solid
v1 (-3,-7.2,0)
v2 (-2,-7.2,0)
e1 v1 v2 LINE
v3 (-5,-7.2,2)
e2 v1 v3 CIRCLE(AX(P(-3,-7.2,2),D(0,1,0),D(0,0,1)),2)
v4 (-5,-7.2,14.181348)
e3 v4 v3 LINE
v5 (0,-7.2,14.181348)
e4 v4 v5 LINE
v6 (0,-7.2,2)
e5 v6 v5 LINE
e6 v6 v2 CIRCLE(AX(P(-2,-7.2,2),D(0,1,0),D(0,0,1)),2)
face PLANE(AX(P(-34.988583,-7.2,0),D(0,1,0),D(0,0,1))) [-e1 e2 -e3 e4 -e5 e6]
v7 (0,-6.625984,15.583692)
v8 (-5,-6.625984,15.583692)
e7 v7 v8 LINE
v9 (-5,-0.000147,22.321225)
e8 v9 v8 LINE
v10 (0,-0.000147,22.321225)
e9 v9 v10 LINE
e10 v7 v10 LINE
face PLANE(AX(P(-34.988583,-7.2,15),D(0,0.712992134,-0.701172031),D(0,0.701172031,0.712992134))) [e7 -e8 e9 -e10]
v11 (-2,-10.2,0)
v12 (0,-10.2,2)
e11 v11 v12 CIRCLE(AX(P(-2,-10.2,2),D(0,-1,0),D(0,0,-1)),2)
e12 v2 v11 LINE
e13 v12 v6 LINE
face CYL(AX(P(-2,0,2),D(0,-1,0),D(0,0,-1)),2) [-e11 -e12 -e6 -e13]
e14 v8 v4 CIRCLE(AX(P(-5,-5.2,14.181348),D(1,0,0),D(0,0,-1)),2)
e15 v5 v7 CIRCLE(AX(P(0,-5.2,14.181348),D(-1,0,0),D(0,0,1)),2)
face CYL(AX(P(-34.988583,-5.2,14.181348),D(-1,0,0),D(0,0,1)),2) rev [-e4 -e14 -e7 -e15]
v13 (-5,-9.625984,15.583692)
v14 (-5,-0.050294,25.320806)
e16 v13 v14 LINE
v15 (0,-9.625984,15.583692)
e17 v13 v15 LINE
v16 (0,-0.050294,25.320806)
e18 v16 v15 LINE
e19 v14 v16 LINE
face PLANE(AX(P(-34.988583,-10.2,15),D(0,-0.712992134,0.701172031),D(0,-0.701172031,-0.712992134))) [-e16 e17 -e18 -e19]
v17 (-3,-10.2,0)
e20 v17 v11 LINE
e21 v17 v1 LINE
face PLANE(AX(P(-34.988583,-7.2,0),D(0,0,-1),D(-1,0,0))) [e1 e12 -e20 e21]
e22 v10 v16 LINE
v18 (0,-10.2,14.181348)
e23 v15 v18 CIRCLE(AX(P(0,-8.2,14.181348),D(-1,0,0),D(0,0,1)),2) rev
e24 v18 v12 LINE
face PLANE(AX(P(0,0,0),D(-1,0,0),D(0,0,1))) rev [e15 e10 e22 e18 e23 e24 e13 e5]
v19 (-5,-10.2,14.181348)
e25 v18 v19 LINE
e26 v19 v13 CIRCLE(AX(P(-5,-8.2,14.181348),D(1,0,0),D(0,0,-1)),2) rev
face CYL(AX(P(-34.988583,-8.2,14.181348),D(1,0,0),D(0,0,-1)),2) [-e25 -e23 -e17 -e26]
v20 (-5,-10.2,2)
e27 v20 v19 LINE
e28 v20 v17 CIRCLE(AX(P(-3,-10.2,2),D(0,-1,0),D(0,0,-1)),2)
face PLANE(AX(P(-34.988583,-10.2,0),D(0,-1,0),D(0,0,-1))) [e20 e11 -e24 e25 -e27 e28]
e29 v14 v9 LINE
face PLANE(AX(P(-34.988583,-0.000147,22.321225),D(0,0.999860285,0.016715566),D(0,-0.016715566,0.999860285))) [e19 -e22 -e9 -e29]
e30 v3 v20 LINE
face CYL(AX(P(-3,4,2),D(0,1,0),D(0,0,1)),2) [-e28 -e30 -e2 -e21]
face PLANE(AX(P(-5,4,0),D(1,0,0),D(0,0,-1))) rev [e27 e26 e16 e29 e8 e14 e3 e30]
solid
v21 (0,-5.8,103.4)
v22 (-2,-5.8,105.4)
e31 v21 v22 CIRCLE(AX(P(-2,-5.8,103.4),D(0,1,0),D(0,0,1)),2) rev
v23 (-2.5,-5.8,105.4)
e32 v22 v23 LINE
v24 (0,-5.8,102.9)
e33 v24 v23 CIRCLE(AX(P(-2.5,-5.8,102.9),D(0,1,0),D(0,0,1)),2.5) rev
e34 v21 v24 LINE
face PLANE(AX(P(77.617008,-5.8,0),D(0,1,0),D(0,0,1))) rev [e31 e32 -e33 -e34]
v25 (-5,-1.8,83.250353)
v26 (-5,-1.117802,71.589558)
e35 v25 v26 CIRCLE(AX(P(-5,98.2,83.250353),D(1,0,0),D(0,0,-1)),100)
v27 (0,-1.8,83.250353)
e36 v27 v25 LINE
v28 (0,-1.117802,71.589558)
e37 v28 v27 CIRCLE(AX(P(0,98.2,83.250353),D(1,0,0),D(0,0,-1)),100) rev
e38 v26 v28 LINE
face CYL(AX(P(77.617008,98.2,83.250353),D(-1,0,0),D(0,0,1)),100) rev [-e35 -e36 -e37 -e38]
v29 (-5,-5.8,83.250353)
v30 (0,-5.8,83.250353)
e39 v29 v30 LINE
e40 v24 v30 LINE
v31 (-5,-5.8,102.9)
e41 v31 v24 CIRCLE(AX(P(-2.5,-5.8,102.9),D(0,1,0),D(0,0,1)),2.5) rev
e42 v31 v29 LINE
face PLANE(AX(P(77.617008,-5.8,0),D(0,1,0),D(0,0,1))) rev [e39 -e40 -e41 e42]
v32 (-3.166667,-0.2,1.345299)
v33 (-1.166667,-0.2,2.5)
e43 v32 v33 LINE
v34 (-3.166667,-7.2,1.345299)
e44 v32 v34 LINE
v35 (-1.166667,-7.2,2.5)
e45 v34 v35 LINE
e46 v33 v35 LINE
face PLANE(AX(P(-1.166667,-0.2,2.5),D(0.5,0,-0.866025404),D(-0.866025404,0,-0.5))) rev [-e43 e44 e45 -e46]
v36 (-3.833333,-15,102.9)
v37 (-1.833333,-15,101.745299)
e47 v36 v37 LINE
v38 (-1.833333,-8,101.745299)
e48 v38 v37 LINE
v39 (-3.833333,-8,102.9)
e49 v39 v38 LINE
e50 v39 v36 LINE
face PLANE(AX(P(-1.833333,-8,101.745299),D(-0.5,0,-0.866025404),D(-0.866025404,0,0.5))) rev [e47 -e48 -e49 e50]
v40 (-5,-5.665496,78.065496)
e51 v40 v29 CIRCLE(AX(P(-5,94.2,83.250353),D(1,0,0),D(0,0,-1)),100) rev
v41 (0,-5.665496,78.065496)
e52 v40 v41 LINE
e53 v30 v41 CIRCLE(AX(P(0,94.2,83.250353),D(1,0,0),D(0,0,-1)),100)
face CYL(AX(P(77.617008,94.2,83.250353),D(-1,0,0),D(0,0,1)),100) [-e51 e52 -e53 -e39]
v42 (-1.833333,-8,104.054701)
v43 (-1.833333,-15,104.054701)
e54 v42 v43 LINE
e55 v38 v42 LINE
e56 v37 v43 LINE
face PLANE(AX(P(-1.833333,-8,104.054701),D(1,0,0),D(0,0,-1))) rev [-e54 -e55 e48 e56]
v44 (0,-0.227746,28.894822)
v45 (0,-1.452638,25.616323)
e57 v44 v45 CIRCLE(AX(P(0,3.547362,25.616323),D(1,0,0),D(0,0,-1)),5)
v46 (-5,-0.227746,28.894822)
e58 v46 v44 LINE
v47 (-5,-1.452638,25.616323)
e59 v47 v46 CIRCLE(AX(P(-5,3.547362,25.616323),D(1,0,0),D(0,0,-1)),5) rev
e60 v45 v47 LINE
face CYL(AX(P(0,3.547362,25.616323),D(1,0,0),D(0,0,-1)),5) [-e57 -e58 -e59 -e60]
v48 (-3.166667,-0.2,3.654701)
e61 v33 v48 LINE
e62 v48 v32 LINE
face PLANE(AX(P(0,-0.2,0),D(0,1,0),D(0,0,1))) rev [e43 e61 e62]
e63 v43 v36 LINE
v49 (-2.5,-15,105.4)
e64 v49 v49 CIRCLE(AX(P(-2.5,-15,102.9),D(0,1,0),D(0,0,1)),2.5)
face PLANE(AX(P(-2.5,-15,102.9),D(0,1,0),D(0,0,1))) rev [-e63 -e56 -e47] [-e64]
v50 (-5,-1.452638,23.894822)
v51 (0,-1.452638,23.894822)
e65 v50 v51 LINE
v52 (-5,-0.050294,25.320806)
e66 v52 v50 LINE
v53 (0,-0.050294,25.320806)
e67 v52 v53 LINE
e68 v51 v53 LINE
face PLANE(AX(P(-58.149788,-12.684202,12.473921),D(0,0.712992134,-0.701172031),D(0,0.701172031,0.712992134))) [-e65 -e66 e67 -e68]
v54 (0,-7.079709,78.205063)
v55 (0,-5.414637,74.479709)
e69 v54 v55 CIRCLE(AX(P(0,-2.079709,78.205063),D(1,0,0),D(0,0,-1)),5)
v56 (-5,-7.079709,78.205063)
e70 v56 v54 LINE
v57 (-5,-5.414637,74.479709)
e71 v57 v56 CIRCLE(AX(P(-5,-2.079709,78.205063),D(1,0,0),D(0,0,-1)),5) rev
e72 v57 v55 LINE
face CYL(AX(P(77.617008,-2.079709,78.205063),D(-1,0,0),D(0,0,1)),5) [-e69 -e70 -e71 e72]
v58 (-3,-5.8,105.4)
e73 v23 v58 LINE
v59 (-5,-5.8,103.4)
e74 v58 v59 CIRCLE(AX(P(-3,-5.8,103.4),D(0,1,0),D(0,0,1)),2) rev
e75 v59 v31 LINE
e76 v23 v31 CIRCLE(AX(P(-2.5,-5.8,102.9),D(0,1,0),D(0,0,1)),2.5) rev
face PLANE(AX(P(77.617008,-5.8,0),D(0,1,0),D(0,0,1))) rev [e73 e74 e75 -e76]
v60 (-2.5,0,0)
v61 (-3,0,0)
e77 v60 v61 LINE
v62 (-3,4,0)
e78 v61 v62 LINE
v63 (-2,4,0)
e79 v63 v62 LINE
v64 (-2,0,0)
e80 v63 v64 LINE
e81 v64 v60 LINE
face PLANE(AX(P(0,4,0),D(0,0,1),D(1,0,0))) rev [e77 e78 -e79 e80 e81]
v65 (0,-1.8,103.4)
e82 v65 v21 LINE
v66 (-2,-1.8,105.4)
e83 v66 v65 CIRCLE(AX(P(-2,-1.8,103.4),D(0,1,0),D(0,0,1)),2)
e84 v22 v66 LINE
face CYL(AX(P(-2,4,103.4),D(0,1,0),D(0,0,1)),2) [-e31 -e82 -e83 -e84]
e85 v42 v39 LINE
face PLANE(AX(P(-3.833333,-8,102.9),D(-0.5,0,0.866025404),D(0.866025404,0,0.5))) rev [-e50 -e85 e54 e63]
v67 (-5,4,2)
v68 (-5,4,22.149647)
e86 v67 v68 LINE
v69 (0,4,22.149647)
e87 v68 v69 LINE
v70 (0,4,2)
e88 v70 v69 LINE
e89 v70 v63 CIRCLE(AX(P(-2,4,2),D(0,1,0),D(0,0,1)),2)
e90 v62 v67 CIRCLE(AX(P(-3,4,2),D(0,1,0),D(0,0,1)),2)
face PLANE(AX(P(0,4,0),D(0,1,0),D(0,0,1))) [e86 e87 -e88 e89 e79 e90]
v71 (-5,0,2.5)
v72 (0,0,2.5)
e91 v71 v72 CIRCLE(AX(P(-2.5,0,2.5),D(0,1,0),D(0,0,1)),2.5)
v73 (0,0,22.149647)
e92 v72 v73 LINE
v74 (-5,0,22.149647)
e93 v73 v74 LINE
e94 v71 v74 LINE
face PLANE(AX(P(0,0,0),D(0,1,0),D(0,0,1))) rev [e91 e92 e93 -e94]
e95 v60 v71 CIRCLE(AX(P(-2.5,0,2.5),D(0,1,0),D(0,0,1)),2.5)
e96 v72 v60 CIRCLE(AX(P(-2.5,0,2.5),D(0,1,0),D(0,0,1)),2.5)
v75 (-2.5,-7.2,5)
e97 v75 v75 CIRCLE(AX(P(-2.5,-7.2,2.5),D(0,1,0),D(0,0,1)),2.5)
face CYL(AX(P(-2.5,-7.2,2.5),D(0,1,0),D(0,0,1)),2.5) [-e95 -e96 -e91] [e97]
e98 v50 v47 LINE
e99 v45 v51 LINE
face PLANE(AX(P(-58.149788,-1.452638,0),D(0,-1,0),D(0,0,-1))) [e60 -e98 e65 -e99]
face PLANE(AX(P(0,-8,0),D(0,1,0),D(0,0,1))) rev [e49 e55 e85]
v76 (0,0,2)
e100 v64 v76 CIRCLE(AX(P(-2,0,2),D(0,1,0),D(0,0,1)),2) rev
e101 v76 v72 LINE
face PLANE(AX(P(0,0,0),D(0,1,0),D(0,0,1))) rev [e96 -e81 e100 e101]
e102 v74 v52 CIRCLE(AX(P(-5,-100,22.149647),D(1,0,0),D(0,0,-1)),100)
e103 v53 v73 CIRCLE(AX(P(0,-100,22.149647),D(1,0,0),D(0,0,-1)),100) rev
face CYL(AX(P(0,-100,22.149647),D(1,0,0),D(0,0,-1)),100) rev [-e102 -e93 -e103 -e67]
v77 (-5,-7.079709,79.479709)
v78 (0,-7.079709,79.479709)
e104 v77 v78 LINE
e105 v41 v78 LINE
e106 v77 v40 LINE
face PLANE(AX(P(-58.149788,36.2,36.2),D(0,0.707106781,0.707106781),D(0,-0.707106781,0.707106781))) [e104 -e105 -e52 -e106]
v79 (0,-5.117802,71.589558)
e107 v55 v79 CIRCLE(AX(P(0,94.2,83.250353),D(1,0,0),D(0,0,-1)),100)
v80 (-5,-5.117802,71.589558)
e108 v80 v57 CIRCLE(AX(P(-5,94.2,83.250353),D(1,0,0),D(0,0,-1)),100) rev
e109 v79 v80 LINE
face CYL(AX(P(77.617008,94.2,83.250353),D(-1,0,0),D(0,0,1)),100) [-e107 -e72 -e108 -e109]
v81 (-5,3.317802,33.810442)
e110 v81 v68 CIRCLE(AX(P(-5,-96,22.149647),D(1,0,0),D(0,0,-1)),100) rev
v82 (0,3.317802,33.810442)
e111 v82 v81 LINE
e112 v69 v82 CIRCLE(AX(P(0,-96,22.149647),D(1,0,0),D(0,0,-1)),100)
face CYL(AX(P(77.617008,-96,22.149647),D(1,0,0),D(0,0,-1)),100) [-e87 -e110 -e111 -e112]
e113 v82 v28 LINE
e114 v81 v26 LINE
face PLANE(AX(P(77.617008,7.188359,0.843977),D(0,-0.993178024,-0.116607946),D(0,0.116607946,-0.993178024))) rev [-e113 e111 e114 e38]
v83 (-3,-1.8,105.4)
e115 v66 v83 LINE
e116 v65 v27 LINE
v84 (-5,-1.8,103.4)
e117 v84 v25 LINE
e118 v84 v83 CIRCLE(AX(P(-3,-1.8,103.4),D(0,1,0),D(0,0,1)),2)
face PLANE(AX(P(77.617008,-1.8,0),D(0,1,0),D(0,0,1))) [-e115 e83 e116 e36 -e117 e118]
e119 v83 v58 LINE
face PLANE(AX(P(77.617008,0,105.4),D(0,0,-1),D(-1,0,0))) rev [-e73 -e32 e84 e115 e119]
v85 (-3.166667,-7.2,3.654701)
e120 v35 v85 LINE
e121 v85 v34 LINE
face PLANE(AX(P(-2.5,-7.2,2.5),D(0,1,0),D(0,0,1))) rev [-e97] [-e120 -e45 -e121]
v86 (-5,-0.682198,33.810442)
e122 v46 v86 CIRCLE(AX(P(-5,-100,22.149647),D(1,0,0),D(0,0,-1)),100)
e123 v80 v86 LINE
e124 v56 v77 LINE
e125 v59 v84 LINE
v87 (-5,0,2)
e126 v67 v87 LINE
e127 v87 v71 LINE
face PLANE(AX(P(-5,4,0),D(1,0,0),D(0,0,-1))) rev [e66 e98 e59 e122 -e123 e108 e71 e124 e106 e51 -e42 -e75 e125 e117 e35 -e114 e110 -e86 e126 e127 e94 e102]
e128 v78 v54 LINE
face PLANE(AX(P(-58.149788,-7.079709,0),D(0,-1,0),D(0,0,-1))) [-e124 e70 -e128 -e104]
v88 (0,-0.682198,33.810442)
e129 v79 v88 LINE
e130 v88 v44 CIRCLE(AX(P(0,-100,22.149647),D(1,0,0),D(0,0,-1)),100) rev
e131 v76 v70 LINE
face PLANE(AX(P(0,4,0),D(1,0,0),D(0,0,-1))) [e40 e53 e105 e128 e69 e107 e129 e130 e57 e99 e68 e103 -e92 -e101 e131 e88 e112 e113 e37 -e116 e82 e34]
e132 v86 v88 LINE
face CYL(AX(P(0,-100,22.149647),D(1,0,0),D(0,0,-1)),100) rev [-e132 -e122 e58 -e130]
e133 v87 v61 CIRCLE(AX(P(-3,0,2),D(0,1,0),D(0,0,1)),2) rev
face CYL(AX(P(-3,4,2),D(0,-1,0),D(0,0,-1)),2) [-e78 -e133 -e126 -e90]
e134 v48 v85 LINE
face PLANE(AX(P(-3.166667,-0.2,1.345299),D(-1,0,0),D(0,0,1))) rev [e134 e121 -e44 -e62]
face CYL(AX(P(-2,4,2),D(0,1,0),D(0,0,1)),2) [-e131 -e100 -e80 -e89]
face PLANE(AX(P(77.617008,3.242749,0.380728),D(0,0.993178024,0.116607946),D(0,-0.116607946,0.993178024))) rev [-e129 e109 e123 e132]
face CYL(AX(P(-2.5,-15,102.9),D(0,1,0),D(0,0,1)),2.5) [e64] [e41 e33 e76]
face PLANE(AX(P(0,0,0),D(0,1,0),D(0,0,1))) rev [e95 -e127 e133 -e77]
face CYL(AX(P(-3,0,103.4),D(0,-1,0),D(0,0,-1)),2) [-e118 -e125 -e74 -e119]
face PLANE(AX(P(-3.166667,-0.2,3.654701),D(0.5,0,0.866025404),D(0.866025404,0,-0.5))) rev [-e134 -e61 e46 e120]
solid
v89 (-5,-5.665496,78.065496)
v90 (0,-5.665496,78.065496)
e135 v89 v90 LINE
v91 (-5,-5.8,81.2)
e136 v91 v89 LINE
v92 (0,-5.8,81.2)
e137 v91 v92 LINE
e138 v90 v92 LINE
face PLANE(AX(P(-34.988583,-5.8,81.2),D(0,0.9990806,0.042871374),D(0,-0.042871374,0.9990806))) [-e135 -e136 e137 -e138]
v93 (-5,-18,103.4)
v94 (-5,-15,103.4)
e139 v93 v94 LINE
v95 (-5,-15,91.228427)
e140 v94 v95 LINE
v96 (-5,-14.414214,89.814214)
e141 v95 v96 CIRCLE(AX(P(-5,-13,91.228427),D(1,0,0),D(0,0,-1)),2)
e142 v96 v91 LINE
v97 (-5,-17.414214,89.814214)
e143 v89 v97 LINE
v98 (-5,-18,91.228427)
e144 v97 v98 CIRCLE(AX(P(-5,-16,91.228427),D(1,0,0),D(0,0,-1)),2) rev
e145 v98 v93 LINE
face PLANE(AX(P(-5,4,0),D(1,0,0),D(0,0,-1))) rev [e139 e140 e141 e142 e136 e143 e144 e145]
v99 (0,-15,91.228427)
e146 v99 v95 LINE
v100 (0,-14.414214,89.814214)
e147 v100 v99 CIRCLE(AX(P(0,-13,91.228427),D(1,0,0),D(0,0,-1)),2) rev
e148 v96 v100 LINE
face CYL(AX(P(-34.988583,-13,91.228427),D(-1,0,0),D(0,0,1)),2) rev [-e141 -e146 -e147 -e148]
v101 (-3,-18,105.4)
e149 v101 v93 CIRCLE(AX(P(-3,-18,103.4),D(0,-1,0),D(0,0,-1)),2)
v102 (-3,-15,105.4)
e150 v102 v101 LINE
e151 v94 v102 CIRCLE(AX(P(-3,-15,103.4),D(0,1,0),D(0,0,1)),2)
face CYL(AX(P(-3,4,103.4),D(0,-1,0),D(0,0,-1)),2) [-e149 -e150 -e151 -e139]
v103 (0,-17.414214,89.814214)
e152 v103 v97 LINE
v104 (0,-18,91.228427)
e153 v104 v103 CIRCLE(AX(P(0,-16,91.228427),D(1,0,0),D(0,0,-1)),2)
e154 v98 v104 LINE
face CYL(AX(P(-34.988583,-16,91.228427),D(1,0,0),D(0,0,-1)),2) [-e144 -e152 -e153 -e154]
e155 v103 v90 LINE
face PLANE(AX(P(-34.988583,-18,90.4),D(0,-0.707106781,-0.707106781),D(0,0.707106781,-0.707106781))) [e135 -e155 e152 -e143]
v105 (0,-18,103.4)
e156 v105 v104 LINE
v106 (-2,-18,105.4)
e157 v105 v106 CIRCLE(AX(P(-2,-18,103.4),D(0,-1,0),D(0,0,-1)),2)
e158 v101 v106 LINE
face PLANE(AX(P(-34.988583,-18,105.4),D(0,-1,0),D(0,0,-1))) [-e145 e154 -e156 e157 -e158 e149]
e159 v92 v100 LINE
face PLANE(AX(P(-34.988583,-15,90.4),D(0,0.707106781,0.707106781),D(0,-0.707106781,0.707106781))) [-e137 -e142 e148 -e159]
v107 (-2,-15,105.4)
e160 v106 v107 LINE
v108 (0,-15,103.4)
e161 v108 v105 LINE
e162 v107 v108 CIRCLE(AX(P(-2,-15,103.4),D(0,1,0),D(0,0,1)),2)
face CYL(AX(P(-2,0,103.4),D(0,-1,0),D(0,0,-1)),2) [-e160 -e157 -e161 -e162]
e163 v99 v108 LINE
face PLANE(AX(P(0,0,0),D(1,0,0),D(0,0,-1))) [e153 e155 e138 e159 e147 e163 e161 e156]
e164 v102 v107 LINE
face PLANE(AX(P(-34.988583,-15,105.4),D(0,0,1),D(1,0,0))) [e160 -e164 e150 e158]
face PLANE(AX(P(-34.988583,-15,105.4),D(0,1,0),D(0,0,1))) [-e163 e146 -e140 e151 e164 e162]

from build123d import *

# Parameters (mm, degrees)
SKETCH1_W             = 5
SKETCH1_H             = 105.4
BOSS_EXTRUDE1_DEPTH   = 4
SKETCH1_3_R           = 2.5
BOSS_EXTRUDE2_DEPTH   = 15
SKETCH1_4_R           = 2.5
BOSS_EXTRUDE3_DEPTH   = 7.2
FILLET1_R             = 1
CUT_EXTRUDE1_DEPTH    = 7
CUT_EXTRUDE2_DEPTH    = 7
BOSS_EXTRUDE4_DEPTH   = 5
CUT_EXTRUDE3_DEPTH    = 5
FILLET2_R             = 100
BOSS_EXTRUDE6_DEPTH   = 5
BOSS_EXTRUDE6_2_DEPTH = 5
BOSS_EXTRUDE7_DEPTH   = 5
FILLET3_R             = 5
FILLET4_R             = 2
FILLET5_R             = 2
FILLET6_R             = 2


with BuildPart() as part:
    # Sketch1 → Boss-Extrude1 (new body)
    with BuildSketch(Plane(origin=(0, 0, 0), x_dir=(1, 0, 0), z_dir=(0, 1, 0))):
        with Locations((-2.5, -52.7)):
            Rectangle(SKETCH1_W, SKETCH1_H)
    extrude(amount=BOSS_EXTRUDE1_DEPTH)

    # Sketch1<3> → Boss-Extrude2 (add)
    with BuildSketch(Plane(origin=(0, 0, 0), x_dir=(1, 0, 0), z_dir=(0, 1, 0))):
        with Locations(Location((-2.5, -102.9, 0), (0, 0, 270))):
            Circle(SKETCH1_3_R)
    extrude(amount=-BOSS_EXTRUDE2_DEPTH)

    # Sketch1<4> → Boss-Extrude3 (add)
    with BuildSketch(Plane(origin=(0, 0, 0), x_dir=(1, 0, 0), z_dir=(0, 1, 0))):
        with Locations(Location((-2.5, -2.5, 0), (0, 0, 270))):
            Circle(SKETCH1_4_R)
    extrude(amount=-BOSS_EXTRUDE3_DEPTH)

    # Fillet1
    fillet1_edges = [part.edges().sort_by_distance(p)[0] for p in [
        (0, 2, 105.4),
        (-5, 2, 105.4),
    ]]
    fillet(fillet1_edges, radius=FILLET1_R)

    # Sketch2 → Cut-Extrude1 (cut)
    with BuildSketch(Plane.XZ.offset(15)):
        Polygon((-1.833333333, 104.054700538), (-1.833333333, 101.745299462), (-3.833333333, 102.9), align=None)
    extrude(amount=-CUT_EXTRUDE1_DEPTH, mode=Mode.SUBTRACT)

    # Sketch3 → Cut-Extrude2 (cut)
    with BuildSketch(Plane(origin=(0, -7.2, 0), x_dir=(-1, 0, 0), z_dir=(0, -1, 0))):
        Polygon((3.166666667, -1.345299462), (3.166666667, -3.654700538), (1.166666667, -2.5), align=None)
    extrude(amount=-CUT_EXTRUDE2_DEPTH, mode=Mode.SUBTRACT)

    # Sketch4 → Boss-Extrude4 (add)
    with BuildSketch(Plane.ZY.offset(5)):
        Polygon((105.4, -5.8), (105.4, -1.8), (77.4, -1.8), (28, 4), (28, 0), (77.4, -5.8), align=None)
    extrude(amount=-BOSS_EXTRUDE4_DEPTH)

    # Sketch4<4> → Cut-Extrude3 (cut)
    with BuildSketch(Plane.ZY.offset(5)):
        Polygon((77.4, -1.8), (105.4, -1.8), (105.4, 4), (28, 4), align=None)
    extrude(amount=-CUT_EXTRUDE3_DEPTH, mode=Mode.SUBTRACT)

    # Fillet2
    fillet2_edges = [part.edges().sort_by_distance(p)[0] for p in [
        (-2.5, 4, 28),
        (-2.5, -1.8, 77.4),
        (-2.5, -5.8, 77.4),
        (-2.5, 0, 28),
    ]]
    fillet(fillet2_edges, radius=FILLET2_R)

    # Sketch6 → Boss-Extrude7 (add)
    with BuildSketch(Plane(origin=(0, 0, 0), x_dir=(0, 0, -1), z_dir=(1, 0, 0))):
        Polygon((-74.479709397, -5.414636547), (-78.065495835, -5.665495835), (-79.479709397, -7.079709397), (-74.479709397, -7.079709397), align=None)
        with BuildLine():
            ThreePointArc((-25.320806157, -0.050293893), (-27.108607835, -0.123032137), (-28.89482189, -0.227746249))
            Line((-28.89482189, -0.227746249), (-28.89482189, -1.452637955))
            Line((-28.89482189, -1.452637955), (-23.89482189, -1.452637955))
            Line((-23.89482189, -1.452637955), (-25.320806157, -0.050293893))
        make_face()
    extrude(amount=-BOSS_EXTRUDE7_DEPTH)

    # Fillet3
    # the kernel refuses this fillet: 5 mm, written as the material it takes off along each edge
    with BuildSketch(Plane(origin=(9.313384489, -7.079709397, 74.479709397), x_dir=(0, 1, 0), z_dir=(-1, 0, 0))) as fillet3_piece_1:
        with BuildLine():
            CenterArc((5, -3.725353796), FILLET3_R, 131.834823038, 48.165176962)
            Line((0, -3.725353796), (-0.1, -3.725353796))
            Line((-0.1, -3.725353796), (-0.1, 0))
            Line((-0.1, 0), (0, 0.1))
            ThreePointArc((0, 0.1), (0.832536425, 0.1), (1.598374307, 0.074507076))
            Line((1.598374307, 0.074507076), (1.66507285, 0))
        make_face()
    extrude(amount=23.626768978, mode=Mode.SUBTRACT)
    with BuildSketch(Plane(origin=(8.196248138, -1.452637955, 28.89482189), x_dir=(0, 1, 0), z_dir=(-1, 0, 0))) as fillet3_piece_2:
        with BuildLine():
            CenterArc((5, 3.278499255), FILLET3_R, 180, 40.972737691)
            Line((0, 3.278499255), (-0.1, 3.278499255))
            Line((-0.1, 3.278499255), (-0.1, 0))
            Line((-0.1, 0), (0, -0.1))
            ThreePointArc((0, -0.1), (0.612445853, -0.1), (1.14938954, -0.065569985))
            Line((1.14938954, -0.065569985), (1.224891706, 0))
        make_face()
    extrude(amount=21.392496276, mode=Mode.SUBTRACT)

    # Fillet5
    fillet5_edges = [part.edges().sort_by_distance(p)[0] for p in [
        (0, -3.8, 105.4),
        (-5, -3.8, 105.4),
        (0, 2, 0),
        (-5, 2, 0),
    ]]
    fillet(fillet5_edges, radius=FILLET5_R)


with BuildPart() as body_2:
    # Sketch5 → Boss-Extrude6 (new body)
    with BuildSketch(Plane(origin=(0, 0, 0), x_dir=(0, 0, -1), z_dir=(1, 0, 0))):
        Polygon((-90.4, -15), (-81.2, -5.8), (-78.065495835, -5.665495835), (-90.4, -18), (-105.4, -18), (-105.4, -15), align=None)
    extrude(amount=-BOSS_EXTRUDE6_DEPTH)

    # Fillet6
    fillet6_edges = [body_2.edges().sort_by_distance(p)[0] for p in [
        (-2.5, -18, 90.4),
        (-2.5, -15, 90.4),
        (-5, -16.5, 105.4),
        (0, -16.5, 105.4),
    ]]
    fillet(fillet6_edges, radius=FILLET6_R)


with BuildPart() as body_3:
    # Sketch5 → Boss-Extrude6 2 (new body)
    with BuildSketch(Plane(origin=(0, 0, 0), x_dir=(0, 0, -1), z_dir=(1, 0, 0))):
        Polygon((0, -7.2), (-15, -7.2), (-22.321225302, -0.000147195), (-25.320806157, -0.050293893), (-15, -10.2), (0, -10.2), align=None)
    extrude(amount=-BOSS_EXTRUDE6_2_DEPTH)

    # Fillet4
    fillet4_edges = [body_3.edges().sort_by_distance(p)[0] for p in [
        (-2.5, -7.2, 15),
        (-2.5, -10.2, 15),
        (-5, -8.7, 0),
        (0, -8.7, 0),
    ]]
    fillet(fillet4_edges, radius=FILLET4_R)


solid = Compound([part.part, body_2.part, body_3.part])
